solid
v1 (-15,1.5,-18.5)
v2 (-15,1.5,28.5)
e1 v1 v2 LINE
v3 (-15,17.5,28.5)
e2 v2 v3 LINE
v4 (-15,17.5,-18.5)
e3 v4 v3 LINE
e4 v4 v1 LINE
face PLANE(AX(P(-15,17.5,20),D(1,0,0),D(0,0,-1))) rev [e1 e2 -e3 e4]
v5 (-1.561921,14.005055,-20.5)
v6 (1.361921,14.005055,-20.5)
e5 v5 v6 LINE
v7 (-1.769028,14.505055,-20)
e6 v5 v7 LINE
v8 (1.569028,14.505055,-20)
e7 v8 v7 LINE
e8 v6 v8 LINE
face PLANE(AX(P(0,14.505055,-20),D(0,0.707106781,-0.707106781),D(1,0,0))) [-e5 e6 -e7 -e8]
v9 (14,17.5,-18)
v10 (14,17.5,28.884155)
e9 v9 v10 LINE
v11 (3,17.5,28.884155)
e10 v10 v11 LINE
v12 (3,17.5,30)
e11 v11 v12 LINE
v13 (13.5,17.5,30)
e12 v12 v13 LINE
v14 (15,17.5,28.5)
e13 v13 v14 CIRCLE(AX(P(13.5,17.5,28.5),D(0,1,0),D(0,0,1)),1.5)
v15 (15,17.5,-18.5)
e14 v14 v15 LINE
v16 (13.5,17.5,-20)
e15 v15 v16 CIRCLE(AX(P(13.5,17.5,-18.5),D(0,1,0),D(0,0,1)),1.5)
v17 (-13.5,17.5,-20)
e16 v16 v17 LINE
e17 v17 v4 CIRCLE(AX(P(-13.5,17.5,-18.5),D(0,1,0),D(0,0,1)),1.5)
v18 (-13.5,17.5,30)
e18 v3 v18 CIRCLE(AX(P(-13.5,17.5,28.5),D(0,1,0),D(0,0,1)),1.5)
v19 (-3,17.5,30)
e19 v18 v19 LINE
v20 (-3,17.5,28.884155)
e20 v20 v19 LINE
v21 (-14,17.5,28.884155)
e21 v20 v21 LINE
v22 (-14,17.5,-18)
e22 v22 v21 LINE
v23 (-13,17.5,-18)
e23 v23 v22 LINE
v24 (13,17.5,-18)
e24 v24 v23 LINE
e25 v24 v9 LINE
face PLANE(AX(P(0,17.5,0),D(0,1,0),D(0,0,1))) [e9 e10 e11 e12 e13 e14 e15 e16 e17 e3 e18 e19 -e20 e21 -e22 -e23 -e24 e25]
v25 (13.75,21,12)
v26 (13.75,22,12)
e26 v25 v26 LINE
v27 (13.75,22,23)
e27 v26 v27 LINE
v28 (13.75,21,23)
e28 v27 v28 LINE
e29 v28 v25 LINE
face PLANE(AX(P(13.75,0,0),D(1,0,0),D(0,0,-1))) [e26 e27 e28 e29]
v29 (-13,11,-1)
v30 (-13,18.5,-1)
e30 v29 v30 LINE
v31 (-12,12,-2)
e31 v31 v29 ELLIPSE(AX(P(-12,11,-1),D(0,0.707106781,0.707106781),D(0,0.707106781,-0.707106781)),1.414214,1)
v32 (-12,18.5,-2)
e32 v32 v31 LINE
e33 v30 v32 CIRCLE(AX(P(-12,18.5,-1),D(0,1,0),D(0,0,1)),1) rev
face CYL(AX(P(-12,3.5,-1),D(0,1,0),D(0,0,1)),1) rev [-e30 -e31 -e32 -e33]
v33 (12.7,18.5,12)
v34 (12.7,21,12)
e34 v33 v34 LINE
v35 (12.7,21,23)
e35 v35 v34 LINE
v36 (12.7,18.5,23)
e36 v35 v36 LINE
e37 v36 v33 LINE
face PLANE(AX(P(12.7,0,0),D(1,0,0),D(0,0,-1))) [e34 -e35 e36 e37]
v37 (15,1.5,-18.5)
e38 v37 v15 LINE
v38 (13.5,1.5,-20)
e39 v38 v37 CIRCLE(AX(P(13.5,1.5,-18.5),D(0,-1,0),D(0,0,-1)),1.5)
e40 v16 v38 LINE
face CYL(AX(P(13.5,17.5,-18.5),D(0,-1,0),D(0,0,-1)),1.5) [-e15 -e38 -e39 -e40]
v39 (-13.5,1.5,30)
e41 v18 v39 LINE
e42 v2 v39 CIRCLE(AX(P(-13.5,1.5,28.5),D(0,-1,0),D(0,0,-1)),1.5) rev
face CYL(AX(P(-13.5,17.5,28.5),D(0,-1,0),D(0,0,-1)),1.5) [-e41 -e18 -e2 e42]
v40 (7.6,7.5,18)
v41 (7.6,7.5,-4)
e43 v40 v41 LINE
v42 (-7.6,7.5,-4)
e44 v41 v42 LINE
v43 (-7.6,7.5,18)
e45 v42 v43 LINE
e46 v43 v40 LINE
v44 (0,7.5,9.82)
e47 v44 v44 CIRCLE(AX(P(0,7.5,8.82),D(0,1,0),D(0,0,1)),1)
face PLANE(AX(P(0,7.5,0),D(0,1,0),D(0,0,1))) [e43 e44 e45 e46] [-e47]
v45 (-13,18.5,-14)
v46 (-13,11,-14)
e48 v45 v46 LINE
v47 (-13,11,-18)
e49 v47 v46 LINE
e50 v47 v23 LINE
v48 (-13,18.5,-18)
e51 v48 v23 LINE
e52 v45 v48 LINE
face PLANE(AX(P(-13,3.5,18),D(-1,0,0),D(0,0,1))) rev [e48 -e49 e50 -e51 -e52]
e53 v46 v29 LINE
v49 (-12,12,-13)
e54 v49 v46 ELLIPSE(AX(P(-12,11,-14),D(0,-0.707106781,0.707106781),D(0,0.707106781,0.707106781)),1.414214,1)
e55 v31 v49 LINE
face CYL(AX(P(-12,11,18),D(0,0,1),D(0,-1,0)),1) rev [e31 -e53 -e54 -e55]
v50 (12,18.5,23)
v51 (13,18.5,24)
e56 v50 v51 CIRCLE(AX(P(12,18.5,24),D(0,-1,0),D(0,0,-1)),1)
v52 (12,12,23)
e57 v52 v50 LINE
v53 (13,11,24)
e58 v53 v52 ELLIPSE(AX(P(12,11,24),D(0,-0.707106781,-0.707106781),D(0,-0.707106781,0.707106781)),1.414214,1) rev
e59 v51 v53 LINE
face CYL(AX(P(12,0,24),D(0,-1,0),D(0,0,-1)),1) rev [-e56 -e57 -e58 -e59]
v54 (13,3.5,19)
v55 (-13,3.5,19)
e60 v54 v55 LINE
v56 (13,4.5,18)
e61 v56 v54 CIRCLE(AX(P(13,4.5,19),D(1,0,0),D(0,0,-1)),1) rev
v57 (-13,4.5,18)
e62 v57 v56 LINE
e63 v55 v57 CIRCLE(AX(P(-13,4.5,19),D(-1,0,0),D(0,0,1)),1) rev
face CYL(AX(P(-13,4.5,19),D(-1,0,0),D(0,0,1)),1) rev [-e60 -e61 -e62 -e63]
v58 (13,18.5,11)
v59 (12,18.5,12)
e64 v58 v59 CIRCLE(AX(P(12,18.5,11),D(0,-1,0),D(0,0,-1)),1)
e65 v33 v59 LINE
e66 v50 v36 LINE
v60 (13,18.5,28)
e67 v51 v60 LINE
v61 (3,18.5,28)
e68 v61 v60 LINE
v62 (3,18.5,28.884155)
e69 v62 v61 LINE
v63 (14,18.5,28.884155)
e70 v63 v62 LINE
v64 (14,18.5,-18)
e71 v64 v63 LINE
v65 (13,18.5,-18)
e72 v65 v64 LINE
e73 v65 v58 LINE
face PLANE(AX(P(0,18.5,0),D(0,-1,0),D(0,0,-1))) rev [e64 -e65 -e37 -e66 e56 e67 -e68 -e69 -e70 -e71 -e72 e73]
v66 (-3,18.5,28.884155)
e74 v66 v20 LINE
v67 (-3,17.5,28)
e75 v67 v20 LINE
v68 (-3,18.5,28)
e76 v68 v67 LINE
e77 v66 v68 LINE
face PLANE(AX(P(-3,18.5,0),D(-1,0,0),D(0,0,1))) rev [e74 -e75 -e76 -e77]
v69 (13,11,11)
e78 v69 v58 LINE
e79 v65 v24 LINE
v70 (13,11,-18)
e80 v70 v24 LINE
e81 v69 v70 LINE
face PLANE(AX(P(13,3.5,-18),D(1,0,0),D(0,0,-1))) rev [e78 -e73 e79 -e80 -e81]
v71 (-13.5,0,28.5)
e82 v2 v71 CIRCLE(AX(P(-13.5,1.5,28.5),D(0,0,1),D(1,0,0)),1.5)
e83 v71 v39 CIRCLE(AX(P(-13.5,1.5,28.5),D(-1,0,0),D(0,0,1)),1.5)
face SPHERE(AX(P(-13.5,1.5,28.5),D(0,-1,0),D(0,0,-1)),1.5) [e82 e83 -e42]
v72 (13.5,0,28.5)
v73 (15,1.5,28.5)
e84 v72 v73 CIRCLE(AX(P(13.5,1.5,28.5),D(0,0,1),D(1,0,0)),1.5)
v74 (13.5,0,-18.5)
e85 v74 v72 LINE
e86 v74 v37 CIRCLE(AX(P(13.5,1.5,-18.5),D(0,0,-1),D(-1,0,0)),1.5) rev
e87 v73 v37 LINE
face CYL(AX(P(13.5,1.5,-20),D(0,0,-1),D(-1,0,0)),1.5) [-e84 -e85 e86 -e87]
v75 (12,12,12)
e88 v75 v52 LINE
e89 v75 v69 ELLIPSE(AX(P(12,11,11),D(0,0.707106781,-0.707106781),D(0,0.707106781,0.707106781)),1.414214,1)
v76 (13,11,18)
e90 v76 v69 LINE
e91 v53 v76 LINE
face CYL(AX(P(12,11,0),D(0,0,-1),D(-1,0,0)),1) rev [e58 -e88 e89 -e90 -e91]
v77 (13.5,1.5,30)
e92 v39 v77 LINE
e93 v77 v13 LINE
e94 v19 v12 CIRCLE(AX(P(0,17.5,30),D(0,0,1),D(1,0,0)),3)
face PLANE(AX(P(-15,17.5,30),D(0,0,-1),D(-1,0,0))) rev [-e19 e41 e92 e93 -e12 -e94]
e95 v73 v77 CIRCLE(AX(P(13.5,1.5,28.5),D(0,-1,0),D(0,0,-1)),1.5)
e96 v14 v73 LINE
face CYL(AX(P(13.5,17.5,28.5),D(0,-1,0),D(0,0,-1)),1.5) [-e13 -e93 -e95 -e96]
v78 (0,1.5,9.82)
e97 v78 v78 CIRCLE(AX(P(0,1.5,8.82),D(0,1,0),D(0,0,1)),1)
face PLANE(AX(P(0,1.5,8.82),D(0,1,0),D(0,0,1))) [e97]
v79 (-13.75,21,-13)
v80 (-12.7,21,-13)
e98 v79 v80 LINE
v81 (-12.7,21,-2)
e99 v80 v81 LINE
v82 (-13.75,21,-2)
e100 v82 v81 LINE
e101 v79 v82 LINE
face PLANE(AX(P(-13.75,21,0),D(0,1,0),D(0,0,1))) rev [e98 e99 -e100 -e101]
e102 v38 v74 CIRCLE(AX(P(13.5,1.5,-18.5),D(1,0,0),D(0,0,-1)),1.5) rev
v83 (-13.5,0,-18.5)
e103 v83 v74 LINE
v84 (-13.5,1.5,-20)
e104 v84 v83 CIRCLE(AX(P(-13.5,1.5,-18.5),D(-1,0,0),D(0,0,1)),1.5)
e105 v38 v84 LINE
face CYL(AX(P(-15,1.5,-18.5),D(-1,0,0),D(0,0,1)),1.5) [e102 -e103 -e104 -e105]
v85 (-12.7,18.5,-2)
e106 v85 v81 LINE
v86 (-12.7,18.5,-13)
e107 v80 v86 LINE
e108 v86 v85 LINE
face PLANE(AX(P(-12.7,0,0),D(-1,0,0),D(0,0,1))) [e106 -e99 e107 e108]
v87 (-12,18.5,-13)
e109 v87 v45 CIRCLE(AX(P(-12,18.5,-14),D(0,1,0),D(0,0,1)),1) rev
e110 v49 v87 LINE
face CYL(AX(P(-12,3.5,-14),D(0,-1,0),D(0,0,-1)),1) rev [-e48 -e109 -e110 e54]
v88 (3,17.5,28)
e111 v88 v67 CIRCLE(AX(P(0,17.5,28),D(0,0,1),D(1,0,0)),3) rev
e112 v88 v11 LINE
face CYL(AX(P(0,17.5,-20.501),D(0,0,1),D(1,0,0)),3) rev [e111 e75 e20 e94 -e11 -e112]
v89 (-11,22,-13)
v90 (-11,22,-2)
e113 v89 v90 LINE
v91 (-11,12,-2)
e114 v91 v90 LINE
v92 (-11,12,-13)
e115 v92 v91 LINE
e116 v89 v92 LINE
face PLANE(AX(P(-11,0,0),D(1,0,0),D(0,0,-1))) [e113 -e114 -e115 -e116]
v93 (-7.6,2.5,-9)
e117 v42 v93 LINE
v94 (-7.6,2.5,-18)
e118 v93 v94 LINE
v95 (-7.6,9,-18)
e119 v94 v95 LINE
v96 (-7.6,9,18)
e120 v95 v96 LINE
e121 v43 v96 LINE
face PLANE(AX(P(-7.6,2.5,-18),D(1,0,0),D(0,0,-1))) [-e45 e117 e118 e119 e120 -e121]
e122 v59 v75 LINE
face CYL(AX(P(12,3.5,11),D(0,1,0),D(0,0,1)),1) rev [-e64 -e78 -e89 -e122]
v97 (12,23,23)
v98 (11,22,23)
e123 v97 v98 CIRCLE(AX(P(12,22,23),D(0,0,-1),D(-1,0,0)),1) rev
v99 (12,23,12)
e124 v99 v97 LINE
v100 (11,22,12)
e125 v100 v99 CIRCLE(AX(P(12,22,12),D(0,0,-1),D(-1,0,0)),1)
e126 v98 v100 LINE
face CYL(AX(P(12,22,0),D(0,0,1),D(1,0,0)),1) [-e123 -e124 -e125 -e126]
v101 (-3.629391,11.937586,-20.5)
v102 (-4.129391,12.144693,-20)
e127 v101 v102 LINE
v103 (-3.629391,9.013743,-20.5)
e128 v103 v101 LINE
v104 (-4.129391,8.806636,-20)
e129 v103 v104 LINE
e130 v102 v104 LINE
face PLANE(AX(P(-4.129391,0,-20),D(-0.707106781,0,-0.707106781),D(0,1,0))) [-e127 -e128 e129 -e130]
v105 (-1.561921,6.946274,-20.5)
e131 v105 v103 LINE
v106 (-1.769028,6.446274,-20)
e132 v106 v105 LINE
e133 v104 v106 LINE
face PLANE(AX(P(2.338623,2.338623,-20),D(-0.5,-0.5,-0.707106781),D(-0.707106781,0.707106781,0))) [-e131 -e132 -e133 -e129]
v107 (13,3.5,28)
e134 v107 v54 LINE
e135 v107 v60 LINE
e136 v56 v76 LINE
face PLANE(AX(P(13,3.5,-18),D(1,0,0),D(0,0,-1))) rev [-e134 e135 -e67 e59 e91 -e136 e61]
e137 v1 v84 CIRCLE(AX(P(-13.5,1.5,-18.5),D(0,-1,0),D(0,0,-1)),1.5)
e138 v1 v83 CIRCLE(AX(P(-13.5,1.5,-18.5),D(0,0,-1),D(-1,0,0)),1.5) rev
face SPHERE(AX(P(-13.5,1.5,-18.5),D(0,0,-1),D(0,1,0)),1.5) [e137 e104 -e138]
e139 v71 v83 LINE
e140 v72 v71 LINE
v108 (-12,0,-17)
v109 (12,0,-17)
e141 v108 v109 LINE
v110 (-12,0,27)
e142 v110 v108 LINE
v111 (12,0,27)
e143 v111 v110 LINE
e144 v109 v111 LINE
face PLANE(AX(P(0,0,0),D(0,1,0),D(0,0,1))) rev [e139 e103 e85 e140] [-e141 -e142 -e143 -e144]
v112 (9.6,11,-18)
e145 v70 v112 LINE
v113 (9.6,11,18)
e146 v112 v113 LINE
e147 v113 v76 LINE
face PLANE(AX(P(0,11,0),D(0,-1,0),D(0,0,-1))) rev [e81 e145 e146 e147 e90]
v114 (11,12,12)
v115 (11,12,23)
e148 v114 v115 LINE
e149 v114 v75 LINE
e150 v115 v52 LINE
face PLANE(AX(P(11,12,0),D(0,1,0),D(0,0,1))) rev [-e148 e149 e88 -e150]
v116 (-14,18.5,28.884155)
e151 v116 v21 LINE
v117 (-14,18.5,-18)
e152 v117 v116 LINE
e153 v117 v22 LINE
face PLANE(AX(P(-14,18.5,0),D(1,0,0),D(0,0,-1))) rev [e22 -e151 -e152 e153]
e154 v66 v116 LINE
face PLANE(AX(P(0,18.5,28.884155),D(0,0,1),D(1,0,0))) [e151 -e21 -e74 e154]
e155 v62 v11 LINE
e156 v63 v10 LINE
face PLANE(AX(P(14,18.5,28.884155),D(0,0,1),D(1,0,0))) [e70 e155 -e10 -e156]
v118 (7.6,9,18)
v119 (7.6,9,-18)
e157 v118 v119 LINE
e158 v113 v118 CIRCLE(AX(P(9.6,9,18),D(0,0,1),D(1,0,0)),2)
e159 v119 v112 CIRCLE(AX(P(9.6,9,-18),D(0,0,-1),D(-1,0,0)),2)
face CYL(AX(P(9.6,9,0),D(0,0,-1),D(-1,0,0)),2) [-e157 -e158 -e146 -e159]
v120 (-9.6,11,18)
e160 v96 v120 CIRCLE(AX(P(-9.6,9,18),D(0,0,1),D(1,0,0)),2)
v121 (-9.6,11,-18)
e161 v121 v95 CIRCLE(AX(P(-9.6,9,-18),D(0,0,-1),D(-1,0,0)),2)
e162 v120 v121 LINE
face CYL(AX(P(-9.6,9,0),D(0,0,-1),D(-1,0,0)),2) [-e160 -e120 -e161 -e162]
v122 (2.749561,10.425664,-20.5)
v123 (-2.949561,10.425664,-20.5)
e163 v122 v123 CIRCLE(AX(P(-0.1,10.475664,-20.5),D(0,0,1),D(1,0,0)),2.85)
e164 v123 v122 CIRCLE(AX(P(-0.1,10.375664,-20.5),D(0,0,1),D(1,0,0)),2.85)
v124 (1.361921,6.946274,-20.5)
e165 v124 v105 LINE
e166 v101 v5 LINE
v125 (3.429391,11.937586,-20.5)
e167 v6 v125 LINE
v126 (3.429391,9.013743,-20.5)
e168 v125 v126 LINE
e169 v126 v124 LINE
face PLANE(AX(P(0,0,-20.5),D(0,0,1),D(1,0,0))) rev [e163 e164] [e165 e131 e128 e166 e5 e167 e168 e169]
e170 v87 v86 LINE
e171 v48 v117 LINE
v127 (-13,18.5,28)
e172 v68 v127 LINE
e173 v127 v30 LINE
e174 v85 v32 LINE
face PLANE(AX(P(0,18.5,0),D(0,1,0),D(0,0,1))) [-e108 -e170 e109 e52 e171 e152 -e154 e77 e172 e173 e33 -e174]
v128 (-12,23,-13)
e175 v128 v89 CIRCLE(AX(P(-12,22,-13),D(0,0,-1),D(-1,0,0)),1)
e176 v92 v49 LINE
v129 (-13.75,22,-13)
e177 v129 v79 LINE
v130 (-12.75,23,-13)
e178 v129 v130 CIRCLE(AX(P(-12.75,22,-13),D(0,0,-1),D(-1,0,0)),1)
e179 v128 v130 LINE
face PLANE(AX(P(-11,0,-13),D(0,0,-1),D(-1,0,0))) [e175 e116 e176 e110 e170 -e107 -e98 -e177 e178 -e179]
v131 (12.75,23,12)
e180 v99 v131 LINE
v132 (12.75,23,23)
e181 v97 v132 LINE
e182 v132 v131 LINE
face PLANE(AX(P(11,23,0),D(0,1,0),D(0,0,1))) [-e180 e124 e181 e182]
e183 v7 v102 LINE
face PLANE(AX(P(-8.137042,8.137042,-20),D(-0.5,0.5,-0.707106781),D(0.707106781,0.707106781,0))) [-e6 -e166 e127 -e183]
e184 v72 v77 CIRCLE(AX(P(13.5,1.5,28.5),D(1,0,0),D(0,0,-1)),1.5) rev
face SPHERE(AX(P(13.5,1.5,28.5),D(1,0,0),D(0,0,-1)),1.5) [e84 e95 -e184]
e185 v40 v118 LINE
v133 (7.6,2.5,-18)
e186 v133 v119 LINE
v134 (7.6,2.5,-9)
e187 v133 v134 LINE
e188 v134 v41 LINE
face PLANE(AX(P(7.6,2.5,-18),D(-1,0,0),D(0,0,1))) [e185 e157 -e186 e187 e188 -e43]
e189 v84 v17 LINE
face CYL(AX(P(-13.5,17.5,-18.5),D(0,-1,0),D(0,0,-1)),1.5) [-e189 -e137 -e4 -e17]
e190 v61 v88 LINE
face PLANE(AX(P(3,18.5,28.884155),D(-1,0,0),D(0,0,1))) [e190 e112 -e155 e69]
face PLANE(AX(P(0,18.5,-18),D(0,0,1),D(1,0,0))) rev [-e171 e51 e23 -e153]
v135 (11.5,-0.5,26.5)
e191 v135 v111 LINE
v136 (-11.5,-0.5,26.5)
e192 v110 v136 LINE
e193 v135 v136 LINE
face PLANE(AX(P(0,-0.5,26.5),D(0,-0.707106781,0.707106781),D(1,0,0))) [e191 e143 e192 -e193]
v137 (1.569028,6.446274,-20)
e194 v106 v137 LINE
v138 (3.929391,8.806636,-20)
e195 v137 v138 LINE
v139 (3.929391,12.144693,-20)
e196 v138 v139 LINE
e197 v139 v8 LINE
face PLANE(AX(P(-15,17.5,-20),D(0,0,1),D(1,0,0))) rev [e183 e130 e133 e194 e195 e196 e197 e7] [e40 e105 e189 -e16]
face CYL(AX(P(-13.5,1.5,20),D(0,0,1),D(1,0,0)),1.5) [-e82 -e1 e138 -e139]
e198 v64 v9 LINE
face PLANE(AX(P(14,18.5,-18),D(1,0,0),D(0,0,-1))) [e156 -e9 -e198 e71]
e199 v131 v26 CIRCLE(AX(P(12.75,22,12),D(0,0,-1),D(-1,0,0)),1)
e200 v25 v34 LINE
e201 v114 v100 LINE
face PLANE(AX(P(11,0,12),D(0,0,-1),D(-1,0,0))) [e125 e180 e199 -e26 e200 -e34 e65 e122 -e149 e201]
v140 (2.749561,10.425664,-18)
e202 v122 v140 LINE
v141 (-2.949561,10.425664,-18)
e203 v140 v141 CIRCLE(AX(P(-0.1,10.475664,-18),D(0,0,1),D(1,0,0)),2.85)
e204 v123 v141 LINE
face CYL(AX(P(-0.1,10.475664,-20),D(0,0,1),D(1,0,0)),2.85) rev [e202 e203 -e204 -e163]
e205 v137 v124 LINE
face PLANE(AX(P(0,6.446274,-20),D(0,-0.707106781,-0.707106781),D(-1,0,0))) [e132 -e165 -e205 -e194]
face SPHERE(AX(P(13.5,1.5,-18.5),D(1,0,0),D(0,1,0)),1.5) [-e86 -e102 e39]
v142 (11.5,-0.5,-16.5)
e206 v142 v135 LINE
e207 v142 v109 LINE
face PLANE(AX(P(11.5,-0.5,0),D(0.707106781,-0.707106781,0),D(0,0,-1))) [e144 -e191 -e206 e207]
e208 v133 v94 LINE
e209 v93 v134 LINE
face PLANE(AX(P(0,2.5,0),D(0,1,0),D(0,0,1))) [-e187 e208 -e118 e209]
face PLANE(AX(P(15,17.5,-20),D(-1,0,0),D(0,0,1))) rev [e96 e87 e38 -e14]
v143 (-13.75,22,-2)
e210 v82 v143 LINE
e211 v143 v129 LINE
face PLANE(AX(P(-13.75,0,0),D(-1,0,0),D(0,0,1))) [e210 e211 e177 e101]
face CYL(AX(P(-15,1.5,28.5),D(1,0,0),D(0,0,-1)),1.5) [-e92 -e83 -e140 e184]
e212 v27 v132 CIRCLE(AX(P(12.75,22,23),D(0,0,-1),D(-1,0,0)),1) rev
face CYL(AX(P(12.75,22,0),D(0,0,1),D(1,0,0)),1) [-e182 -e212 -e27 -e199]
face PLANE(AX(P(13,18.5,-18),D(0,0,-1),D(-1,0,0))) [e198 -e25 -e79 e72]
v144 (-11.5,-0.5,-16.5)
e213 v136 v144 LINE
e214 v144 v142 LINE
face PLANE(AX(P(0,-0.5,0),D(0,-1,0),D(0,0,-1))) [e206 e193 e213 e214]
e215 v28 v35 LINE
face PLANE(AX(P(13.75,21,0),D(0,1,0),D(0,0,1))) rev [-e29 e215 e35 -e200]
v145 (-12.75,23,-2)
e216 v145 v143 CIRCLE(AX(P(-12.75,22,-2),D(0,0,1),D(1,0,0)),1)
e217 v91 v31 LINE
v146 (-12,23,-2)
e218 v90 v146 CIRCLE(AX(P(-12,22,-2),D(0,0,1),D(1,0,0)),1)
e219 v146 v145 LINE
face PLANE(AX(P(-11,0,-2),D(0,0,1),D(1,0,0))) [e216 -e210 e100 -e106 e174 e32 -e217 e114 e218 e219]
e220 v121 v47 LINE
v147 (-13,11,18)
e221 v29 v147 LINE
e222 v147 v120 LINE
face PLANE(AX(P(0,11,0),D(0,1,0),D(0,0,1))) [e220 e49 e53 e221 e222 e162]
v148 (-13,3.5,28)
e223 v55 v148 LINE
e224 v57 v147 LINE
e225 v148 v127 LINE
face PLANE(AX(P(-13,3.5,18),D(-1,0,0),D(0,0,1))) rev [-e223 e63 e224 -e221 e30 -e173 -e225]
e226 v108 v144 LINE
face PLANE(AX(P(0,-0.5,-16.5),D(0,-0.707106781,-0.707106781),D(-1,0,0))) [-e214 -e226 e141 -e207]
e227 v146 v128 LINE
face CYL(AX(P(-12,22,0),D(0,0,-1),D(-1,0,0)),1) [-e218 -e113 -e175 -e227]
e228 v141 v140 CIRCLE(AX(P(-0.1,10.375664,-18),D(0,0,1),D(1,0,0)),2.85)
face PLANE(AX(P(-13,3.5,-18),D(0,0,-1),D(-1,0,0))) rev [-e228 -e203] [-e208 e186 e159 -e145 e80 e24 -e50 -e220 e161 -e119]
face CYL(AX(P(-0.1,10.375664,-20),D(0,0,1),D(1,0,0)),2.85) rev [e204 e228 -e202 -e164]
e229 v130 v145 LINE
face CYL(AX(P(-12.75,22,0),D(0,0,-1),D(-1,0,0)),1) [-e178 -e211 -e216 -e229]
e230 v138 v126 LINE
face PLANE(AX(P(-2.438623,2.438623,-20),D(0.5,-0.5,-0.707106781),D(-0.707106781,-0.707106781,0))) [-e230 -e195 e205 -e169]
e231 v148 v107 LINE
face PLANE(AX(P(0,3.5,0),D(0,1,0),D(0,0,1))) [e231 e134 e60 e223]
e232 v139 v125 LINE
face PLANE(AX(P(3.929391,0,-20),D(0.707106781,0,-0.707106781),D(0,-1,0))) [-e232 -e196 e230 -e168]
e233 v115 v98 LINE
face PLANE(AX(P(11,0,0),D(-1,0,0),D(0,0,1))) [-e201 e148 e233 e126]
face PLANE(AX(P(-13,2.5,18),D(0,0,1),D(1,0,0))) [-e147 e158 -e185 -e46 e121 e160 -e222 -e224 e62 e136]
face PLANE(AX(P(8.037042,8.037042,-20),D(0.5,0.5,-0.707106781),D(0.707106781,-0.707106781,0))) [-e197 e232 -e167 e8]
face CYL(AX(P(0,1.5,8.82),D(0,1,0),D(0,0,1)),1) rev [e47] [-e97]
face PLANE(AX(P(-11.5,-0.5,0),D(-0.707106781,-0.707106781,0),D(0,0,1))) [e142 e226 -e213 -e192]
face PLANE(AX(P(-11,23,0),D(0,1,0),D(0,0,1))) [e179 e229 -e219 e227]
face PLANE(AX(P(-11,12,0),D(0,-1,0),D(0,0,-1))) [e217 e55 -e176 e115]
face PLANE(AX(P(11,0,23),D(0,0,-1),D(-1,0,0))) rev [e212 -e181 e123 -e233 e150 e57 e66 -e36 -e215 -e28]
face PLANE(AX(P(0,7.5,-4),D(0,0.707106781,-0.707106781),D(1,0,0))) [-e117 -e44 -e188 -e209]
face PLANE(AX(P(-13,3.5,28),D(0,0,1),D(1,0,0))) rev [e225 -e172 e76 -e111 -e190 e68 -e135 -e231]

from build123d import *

# Parameters (mm, degrees)
BOSS_EXTRUDE1_DEPTH      = 17.5
CUT_EXTRUDE1_DEPTH       = 14
CUT_EXTRUDE2_DEPTH       = 54.247065647
SKETCH4_W                = 26
SKETCH4_H                = 8
CUT_EXTRUDE3_DEPTH       = 1
BOSS_EXTRUDE3_DEPTH      = 7.5
BOSS_EXTRUDE3_DEPTH_BACK = 1
SKETCH6_W                = 5.4
SKETCH6_H                = 36
FILLET2_R                = 2
FILLET5_R                = 1.5
SKETCH13_W               = 15.2
SKETCH13_H               = 28
BOSS_EXTRUDE7_DEPTH      = 4
SKETCH15_R               = 1
CUT_EXTRUDE8_DEPTH       = 6
CHAMFER5_SIZE            = 6
SKETCH16_W               = 11
SKETCH16_H               = 5.5
BOSS_EXTRUDE8_DEPTH      = 2
SKETCH17_W               = 11
SKETCH17_H               = 5.5
BOSS_EXTRUDE9_DEPTH      = 2
BOSS_EXTRUDE14_START     = -2
BOSS_EXTRUDE14_DEPTH     = 0.5
CHAMFER6_SIZE            = 0.5
BOSS_EXTRUDE15_DEPTH     = 0.5
CHAMFER7_SIZE            = 0.5
CUT_EXTRUDE9_REACH       = 59.483
BOSS_EXTRUDE16_DEPTH     = 1
FILLET7_R                = 1
SKETCH27_W               = 11
SKETCH27_H               = 2
BOSS_EXTRUDE17_DEPTH     = 0.75
SKETCH27_3_W             = 11
SKETCH27_3_H             = 2.5
CUT_EXTRUDE10_DEPTH      = 0.3
SKETCH29_W               = 11
SKETCH29_H               = 2
BOSS_EXTRUDE18_DEPTH     = 0.75
SKETCH29_4_W             = 11
SKETCH29_4_H             = 2.5
CUT_EXTRUDE11_DEPTH      = 0.3
FILLET8_R                = 1


# Some blends are built 0.0001 mm under size
with BuildPart() as part:
    # Sketch1 → Boss-Extrude1 (new body)
    with BuildSketch(Plane(origin=(0, 0, 0), x_dir=(1, 0, 0), z_dir=(0, 1, 0))):
        Polygon((-15, 20), (15, 20), (15, -20), (15, -30), (-15, -30), (-15, -20), align=None)
    extrude(amount=BOSS_EXTRUDE1_DEPTH)

    # Sketch2 → Cut-Extrude1 (cut)
    with BuildSketch(Plane(origin=(0, 17.5, 0), x_dir=(1, 0, 0), z_dir=(0, 1, 0))):
        Polygon((-13, 18), (13, 18), (13, -18), (13, -28), (-13, -28), (-13, -18), align=None)
    extrude(amount=-CUT_EXTRUDE1_DEPTH, mode=Mode.SUBTRACT)

    # Sketch3 → Cut-Extrude2 (cut, through all)
    with BuildSketch(Plane.XY.offset(-18)):
        with BuildLine():
            ThreePointArc((2.74956137, 10.425664385), (-0.1, 13.325664385), (-2.94956137, 10.425664385))
            ThreePointArc((-2.94956137, 10.425664385), (-0.1, 7.525664385), (2.74956137, 10.425664385))
        make_face()
    extrude(amount=-CUT_EXTRUDE2_DEPTH, mode=Mode.SUBTRACT)

    # Sketch4 → Cut-Extrude3 (cut)
    with BuildSketch(Plane(origin=(0, 3.5, 0), x_dir=(1, 0, 0), z_dir=(0, 1, 0))):
        with Locations((0, 14)):
            Rectangle(SKETCH4_W, SKETCH4_H)
    extrude(amount=-CUT_EXTRUDE3_DEPTH, mode=Mode.SUBTRACT)

    # Sketch6 → Boss-Extrude3 (add, two sides: drawn at the far end of the back side and taken through both)
    with BuildSketch(Plane(origin=(0, 3.5, 0), x_dir=(1, 0, 0), z_dir=(0, 1, 0)).offset(-BOSS_EXTRUDE3_DEPTH_BACK)):
        with Locations((-10.3, 0)):
            Rectangle(SKETCH6_W, SKETCH6_H)
        with Locations((10.3, 0)):
            Rectangle(SKETCH6_W, SKETCH6_H)
    extrude(amount=BOSS_EXTRUDE3_DEPTH + BOSS_EXTRUDE3_DEPTH_BACK)

    # Fillet2
    fillet2_edges = [part.edges().sort_by_distance(p)[0] for p in [
        (-7.6, 11, 0),
        (7.6, 11, 0),
    ]]
    fillet(fillet2_edges, radius=FILLET2_R)

    # Fillet5
    fillet5_edges = [part.edges().sort_by_distance(p)[0] for p in [
        (15, 8.75, 30),
        (-15, 8.75, 30),
        (-15, 8.75, -20),
        (15, 8.75, -20),
        (0, 0, 30),
        (-15, 0, 5),
        (0, 0, -20),
        (15, 0, 5),
    ]]
    fillet(fillet5_edges, radius=FILLET5_R)

    # Sketch13 → Boss-Extrude7 (add)
    with BuildSketch(Plane(origin=(0, 3.5, 0), x_dir=(1, 0, 0), z_dir=(0, 1, 0))):
        with Locations((0, -4)):
            Rectangle(SKETCH13_W, SKETCH13_H)
    extrude(amount=BOSS_EXTRUDE7_DEPTH)

    # Sketch15 → Cut-Extrude8 (cut)
    with BuildSketch(Plane(origin=(0, 7.5, 0), x_dir=(1, 0, 0), z_dir=(0, 1, 0))):
        with Locations(Location((0, -8.82, 0), (0, 0, 270))):
            Circle(SKETCH15_R)
    extrude(amount=-CUT_EXTRUDE8_DEPTH, mode=Mode.SUBTRACT)

    # Chamfer5
    # the kernel refuses this chamfer: 6 mm, written as the material it takes off along each edge
    with BuildSketch(Plane(origin=(-7.6, 7.5, -10), x_dir=(0, -0.9996219169112968, -0.02749587661058649), z_dir=(1, 0, 0))) as chamfer5_piece_1_section:
        Polygon((CHAMFER5_SIZE * 0.999621916911, -CHAMFER5_SIZE * 0.0274958766106), (-CHAMFER5_SIZE * 0.0274958766106, -CHAMFER5_SIZE * 0.999621916911), (0, 0), align=None)
    chamfer5_piece_1 = extrude(amount=15.2, mode=Mode.PRIVATE)
    chamfer5_piece_1 = split(chamfer5_piece_1, bisect_by=Plane(origin=(0, 2.5, -7.952380952), z_dir=(0, 1, 0)), keep=Keep.TOP, mode=Mode.PRIVATE)
    add(chamfer5_piece_1, mode=Mode.SUBTRACT)

    # Sketch16 → Boss-Extrude8 (add)
    with BuildSketch(Plane(origin=(-13, 0, 0), x_dir=(0, 0, -1), z_dir=(1, 0, 0))):
        Polygon((2, 17.5), (2, 14.5), (2, 12), (13, 12), (13, 14.5), (13, 17.5), align=None)
        with Locations((7.5, 20.25)):
            Rectangle(SKETCH16_W, SKETCH16_H)
    extrude(amount=BOSS_EXTRUDE8_DEPTH)

    # Sketch17 → Boss-Extrude9 (add)
    with BuildSketch(Plane.ZY.offset(-13)):
        with Locations((17.5, 20.25)):
            Rectangle(SKETCH17_W, SKETCH17_H)
        Polygon((12, 17.5), (12, 14.5), (12, 12), (23, 12), (23, 14.5), (23, 17.5), align=None)
    extrude(amount=BOSS_EXTRUDE9_DEPTH)

    # Sketch3<4> → Boss-Extrude14 (add)
    with BuildSketch(Plane.XY.offset(-18).offset(BOSS_EXTRUDE14_START)):
        Polygon((-4.129390667, 8.806636123), (-1.769028262, 6.446273719), (1.569028262, 6.446273719), (3.929390667, 8.806636123), (3.929390667, 12.144692648), (1.569028262, 14.505055052), (-1.769028262, 14.505055052), (-4.129390667, 12.144692648), align=None)
        with BuildLine():
            ThreePointArc((-2.94956137, 10.425664385), (-0.1, 7.525664385), (2.74956137, 10.425664385))
            ThreePointArc((2.74956137, 10.425664385), (-0.1, 13.325664385), (-2.94956137, 10.425664385))
        make_face(mode=Mode.SUBTRACT)
    extrude(amount=-BOSS_EXTRUDE14_DEPTH)

    # Chamfer6
    chamfer6_edges = [part.edges().sort_by_distance(p)[0] for p in [
        (2.749209465, 13.32487385, -20.5),
        (3.929390667, 10.475664385, -20.5),
        (2.749209465, 7.626454921, -20.5),
        (-0.1, 6.446273719, -20.5),
        (-2.949209465, 7.626454921, -20.5),
        (-4.129390667, 10.475664385, -20.5),
        (-2.949209465, 13.32487385, -20.5),
        (-0.1, 14.505055052, -20.5),
    ]]
    chamfer(chamfer6_edges, length=CHAMFER6_SIZE - 0.0001)  # a hair under: the kernel refuses the full size

    # Sketch23 → Boss-Extrude15 (add)
    with BuildSketch(Plane.XZ):
        Polygon((-12, 17), (-12, -17), (12, -17), (12, 17), (12, 27), (-12, 27), align=None)
    extrude(amount=BOSS_EXTRUDE15_DEPTH)

    # Chamfer7
    chamfer7_edges = [part.edges().sort_by_distance(p)[0] for p in [
        (12, -0.5, 5),
        (-12, -0.5, 5),
        (0, -0.5, -17),
        (0, -0.5, 27),
    ]]
    chamfer(chamfer7_edges, length=CHAMFER7_SIZE - 0.0001)  # a hair under: the kernel refuses the full size

    # Sketch24 → Cut-Extrude9 (cut, up to next)
    with BuildSketch(Plane.XY.offset(30), mode=Mode.PRIVATE) as cut_extrude9_sk1:
        with BuildLine():
            Line((-3, 17.5), (3, 17.5))
            ThreePointArc((3, 17.5), (0, 14.5), (-3, 17.5))
        make_face()
    cut_extrude9_tool1 = extrude(cut_extrude9_sk1.sketch, amount=-CUT_EXTRUDE9_REACH, mode=Mode.PRIVATE) & part.part
    add(cut_extrude9_tool1.solids().sort_by_distance((0, 16.22676, 30))[0], mode=Mode.SUBTRACT)

    # Sketch26 → Boss-Extrude16 (add)
    with BuildSketch(Plane(origin=(0, 17.5, 0), x_dir=(1, 0, 0), z_dir=(0, 1, 0))):
        Polygon((-13, 13), (-13, 18), (-14, 18), (-14, -19.115845085), (-14, -28.884154915), (-3, -28.884154915), (-3, -28), (-13, -28), (-13, 2), align=None)
        Polygon((3, -28), (13, -28), (13, 18), (14, 18), (14, -28.884154915), (3, -28.884154915), align=None)
    extrude(amount=BOSS_EXTRUDE16_DEPTH)

    # Fillet7
    fillet7_edges = [part.edges().sort_by_distance(p)[0] for p in [
        (-13, 15.25, -13),
        (-13, 15.25, -2),
        (-13, 12, -7.5),
        (13, 15.25, 12),
        (13, 12, 17.5),
        (13, 15.25, 23),
        (0, 3.5, 18),
    ]]
    fillet(fillet7_edges, radius=FILLET7_R - 0.0001)  # a hair under: the kernel refuses the full size

    # Sketch27 → Boss-Extrude17 (add)
    with BuildSketch(Plane.ZY.offset(13)):
        with Locations((-7.5, 22)):
            Rectangle(SKETCH27_W, SKETCH27_H)
    extrude(amount=BOSS_EXTRUDE17_DEPTH)

    # Sketch27<3> → Cut-Extrude10 (cut)
    with BuildSketch(Plane.ZY.offset(13)):
        with Locations((-7.5, 19.75)):
            Rectangle(SKETCH27_3_W, SKETCH27_3_H)
    extrude(amount=-CUT_EXTRUDE10_DEPTH, mode=Mode.SUBTRACT)

    # Sketch29 → Boss-Extrude18 (add)
    with BuildSketch(Plane(origin=(13, 0, 0), x_dir=(0, 0, -1), z_dir=(1, 0, 0))):
        with Locations((-17.5, 22)):
            Rectangle(SKETCH29_W, SKETCH29_H)
    extrude(amount=BOSS_EXTRUDE18_DEPTH)

    # Sketch29<4> → Cut-Extrude11 (cut)
    with BuildSketch(Plane(origin=(13, 0, 0), x_dir=(0, 0, -1), z_dir=(1, 0, 0))):
        with Locations((-17.5, 19.75)):
            Rectangle(SKETCH29_4_W, SKETCH29_4_H)
    extrude(amount=-CUT_EXTRUDE11_DEPTH, mode=Mode.SUBTRACT)

    # Fillet8
    fillet8_edges = [part.edges().sort_by_distance(p)[0] for p in [
        (-11, 23, -7.5),
        (11, 23, 17.5),
        (-13.75, 23, -7.5),
        (13.75, 23, 17.5),
    ]]
    fillet(fillet8_edges, radius=FILLET8_R)


solid = part.part
